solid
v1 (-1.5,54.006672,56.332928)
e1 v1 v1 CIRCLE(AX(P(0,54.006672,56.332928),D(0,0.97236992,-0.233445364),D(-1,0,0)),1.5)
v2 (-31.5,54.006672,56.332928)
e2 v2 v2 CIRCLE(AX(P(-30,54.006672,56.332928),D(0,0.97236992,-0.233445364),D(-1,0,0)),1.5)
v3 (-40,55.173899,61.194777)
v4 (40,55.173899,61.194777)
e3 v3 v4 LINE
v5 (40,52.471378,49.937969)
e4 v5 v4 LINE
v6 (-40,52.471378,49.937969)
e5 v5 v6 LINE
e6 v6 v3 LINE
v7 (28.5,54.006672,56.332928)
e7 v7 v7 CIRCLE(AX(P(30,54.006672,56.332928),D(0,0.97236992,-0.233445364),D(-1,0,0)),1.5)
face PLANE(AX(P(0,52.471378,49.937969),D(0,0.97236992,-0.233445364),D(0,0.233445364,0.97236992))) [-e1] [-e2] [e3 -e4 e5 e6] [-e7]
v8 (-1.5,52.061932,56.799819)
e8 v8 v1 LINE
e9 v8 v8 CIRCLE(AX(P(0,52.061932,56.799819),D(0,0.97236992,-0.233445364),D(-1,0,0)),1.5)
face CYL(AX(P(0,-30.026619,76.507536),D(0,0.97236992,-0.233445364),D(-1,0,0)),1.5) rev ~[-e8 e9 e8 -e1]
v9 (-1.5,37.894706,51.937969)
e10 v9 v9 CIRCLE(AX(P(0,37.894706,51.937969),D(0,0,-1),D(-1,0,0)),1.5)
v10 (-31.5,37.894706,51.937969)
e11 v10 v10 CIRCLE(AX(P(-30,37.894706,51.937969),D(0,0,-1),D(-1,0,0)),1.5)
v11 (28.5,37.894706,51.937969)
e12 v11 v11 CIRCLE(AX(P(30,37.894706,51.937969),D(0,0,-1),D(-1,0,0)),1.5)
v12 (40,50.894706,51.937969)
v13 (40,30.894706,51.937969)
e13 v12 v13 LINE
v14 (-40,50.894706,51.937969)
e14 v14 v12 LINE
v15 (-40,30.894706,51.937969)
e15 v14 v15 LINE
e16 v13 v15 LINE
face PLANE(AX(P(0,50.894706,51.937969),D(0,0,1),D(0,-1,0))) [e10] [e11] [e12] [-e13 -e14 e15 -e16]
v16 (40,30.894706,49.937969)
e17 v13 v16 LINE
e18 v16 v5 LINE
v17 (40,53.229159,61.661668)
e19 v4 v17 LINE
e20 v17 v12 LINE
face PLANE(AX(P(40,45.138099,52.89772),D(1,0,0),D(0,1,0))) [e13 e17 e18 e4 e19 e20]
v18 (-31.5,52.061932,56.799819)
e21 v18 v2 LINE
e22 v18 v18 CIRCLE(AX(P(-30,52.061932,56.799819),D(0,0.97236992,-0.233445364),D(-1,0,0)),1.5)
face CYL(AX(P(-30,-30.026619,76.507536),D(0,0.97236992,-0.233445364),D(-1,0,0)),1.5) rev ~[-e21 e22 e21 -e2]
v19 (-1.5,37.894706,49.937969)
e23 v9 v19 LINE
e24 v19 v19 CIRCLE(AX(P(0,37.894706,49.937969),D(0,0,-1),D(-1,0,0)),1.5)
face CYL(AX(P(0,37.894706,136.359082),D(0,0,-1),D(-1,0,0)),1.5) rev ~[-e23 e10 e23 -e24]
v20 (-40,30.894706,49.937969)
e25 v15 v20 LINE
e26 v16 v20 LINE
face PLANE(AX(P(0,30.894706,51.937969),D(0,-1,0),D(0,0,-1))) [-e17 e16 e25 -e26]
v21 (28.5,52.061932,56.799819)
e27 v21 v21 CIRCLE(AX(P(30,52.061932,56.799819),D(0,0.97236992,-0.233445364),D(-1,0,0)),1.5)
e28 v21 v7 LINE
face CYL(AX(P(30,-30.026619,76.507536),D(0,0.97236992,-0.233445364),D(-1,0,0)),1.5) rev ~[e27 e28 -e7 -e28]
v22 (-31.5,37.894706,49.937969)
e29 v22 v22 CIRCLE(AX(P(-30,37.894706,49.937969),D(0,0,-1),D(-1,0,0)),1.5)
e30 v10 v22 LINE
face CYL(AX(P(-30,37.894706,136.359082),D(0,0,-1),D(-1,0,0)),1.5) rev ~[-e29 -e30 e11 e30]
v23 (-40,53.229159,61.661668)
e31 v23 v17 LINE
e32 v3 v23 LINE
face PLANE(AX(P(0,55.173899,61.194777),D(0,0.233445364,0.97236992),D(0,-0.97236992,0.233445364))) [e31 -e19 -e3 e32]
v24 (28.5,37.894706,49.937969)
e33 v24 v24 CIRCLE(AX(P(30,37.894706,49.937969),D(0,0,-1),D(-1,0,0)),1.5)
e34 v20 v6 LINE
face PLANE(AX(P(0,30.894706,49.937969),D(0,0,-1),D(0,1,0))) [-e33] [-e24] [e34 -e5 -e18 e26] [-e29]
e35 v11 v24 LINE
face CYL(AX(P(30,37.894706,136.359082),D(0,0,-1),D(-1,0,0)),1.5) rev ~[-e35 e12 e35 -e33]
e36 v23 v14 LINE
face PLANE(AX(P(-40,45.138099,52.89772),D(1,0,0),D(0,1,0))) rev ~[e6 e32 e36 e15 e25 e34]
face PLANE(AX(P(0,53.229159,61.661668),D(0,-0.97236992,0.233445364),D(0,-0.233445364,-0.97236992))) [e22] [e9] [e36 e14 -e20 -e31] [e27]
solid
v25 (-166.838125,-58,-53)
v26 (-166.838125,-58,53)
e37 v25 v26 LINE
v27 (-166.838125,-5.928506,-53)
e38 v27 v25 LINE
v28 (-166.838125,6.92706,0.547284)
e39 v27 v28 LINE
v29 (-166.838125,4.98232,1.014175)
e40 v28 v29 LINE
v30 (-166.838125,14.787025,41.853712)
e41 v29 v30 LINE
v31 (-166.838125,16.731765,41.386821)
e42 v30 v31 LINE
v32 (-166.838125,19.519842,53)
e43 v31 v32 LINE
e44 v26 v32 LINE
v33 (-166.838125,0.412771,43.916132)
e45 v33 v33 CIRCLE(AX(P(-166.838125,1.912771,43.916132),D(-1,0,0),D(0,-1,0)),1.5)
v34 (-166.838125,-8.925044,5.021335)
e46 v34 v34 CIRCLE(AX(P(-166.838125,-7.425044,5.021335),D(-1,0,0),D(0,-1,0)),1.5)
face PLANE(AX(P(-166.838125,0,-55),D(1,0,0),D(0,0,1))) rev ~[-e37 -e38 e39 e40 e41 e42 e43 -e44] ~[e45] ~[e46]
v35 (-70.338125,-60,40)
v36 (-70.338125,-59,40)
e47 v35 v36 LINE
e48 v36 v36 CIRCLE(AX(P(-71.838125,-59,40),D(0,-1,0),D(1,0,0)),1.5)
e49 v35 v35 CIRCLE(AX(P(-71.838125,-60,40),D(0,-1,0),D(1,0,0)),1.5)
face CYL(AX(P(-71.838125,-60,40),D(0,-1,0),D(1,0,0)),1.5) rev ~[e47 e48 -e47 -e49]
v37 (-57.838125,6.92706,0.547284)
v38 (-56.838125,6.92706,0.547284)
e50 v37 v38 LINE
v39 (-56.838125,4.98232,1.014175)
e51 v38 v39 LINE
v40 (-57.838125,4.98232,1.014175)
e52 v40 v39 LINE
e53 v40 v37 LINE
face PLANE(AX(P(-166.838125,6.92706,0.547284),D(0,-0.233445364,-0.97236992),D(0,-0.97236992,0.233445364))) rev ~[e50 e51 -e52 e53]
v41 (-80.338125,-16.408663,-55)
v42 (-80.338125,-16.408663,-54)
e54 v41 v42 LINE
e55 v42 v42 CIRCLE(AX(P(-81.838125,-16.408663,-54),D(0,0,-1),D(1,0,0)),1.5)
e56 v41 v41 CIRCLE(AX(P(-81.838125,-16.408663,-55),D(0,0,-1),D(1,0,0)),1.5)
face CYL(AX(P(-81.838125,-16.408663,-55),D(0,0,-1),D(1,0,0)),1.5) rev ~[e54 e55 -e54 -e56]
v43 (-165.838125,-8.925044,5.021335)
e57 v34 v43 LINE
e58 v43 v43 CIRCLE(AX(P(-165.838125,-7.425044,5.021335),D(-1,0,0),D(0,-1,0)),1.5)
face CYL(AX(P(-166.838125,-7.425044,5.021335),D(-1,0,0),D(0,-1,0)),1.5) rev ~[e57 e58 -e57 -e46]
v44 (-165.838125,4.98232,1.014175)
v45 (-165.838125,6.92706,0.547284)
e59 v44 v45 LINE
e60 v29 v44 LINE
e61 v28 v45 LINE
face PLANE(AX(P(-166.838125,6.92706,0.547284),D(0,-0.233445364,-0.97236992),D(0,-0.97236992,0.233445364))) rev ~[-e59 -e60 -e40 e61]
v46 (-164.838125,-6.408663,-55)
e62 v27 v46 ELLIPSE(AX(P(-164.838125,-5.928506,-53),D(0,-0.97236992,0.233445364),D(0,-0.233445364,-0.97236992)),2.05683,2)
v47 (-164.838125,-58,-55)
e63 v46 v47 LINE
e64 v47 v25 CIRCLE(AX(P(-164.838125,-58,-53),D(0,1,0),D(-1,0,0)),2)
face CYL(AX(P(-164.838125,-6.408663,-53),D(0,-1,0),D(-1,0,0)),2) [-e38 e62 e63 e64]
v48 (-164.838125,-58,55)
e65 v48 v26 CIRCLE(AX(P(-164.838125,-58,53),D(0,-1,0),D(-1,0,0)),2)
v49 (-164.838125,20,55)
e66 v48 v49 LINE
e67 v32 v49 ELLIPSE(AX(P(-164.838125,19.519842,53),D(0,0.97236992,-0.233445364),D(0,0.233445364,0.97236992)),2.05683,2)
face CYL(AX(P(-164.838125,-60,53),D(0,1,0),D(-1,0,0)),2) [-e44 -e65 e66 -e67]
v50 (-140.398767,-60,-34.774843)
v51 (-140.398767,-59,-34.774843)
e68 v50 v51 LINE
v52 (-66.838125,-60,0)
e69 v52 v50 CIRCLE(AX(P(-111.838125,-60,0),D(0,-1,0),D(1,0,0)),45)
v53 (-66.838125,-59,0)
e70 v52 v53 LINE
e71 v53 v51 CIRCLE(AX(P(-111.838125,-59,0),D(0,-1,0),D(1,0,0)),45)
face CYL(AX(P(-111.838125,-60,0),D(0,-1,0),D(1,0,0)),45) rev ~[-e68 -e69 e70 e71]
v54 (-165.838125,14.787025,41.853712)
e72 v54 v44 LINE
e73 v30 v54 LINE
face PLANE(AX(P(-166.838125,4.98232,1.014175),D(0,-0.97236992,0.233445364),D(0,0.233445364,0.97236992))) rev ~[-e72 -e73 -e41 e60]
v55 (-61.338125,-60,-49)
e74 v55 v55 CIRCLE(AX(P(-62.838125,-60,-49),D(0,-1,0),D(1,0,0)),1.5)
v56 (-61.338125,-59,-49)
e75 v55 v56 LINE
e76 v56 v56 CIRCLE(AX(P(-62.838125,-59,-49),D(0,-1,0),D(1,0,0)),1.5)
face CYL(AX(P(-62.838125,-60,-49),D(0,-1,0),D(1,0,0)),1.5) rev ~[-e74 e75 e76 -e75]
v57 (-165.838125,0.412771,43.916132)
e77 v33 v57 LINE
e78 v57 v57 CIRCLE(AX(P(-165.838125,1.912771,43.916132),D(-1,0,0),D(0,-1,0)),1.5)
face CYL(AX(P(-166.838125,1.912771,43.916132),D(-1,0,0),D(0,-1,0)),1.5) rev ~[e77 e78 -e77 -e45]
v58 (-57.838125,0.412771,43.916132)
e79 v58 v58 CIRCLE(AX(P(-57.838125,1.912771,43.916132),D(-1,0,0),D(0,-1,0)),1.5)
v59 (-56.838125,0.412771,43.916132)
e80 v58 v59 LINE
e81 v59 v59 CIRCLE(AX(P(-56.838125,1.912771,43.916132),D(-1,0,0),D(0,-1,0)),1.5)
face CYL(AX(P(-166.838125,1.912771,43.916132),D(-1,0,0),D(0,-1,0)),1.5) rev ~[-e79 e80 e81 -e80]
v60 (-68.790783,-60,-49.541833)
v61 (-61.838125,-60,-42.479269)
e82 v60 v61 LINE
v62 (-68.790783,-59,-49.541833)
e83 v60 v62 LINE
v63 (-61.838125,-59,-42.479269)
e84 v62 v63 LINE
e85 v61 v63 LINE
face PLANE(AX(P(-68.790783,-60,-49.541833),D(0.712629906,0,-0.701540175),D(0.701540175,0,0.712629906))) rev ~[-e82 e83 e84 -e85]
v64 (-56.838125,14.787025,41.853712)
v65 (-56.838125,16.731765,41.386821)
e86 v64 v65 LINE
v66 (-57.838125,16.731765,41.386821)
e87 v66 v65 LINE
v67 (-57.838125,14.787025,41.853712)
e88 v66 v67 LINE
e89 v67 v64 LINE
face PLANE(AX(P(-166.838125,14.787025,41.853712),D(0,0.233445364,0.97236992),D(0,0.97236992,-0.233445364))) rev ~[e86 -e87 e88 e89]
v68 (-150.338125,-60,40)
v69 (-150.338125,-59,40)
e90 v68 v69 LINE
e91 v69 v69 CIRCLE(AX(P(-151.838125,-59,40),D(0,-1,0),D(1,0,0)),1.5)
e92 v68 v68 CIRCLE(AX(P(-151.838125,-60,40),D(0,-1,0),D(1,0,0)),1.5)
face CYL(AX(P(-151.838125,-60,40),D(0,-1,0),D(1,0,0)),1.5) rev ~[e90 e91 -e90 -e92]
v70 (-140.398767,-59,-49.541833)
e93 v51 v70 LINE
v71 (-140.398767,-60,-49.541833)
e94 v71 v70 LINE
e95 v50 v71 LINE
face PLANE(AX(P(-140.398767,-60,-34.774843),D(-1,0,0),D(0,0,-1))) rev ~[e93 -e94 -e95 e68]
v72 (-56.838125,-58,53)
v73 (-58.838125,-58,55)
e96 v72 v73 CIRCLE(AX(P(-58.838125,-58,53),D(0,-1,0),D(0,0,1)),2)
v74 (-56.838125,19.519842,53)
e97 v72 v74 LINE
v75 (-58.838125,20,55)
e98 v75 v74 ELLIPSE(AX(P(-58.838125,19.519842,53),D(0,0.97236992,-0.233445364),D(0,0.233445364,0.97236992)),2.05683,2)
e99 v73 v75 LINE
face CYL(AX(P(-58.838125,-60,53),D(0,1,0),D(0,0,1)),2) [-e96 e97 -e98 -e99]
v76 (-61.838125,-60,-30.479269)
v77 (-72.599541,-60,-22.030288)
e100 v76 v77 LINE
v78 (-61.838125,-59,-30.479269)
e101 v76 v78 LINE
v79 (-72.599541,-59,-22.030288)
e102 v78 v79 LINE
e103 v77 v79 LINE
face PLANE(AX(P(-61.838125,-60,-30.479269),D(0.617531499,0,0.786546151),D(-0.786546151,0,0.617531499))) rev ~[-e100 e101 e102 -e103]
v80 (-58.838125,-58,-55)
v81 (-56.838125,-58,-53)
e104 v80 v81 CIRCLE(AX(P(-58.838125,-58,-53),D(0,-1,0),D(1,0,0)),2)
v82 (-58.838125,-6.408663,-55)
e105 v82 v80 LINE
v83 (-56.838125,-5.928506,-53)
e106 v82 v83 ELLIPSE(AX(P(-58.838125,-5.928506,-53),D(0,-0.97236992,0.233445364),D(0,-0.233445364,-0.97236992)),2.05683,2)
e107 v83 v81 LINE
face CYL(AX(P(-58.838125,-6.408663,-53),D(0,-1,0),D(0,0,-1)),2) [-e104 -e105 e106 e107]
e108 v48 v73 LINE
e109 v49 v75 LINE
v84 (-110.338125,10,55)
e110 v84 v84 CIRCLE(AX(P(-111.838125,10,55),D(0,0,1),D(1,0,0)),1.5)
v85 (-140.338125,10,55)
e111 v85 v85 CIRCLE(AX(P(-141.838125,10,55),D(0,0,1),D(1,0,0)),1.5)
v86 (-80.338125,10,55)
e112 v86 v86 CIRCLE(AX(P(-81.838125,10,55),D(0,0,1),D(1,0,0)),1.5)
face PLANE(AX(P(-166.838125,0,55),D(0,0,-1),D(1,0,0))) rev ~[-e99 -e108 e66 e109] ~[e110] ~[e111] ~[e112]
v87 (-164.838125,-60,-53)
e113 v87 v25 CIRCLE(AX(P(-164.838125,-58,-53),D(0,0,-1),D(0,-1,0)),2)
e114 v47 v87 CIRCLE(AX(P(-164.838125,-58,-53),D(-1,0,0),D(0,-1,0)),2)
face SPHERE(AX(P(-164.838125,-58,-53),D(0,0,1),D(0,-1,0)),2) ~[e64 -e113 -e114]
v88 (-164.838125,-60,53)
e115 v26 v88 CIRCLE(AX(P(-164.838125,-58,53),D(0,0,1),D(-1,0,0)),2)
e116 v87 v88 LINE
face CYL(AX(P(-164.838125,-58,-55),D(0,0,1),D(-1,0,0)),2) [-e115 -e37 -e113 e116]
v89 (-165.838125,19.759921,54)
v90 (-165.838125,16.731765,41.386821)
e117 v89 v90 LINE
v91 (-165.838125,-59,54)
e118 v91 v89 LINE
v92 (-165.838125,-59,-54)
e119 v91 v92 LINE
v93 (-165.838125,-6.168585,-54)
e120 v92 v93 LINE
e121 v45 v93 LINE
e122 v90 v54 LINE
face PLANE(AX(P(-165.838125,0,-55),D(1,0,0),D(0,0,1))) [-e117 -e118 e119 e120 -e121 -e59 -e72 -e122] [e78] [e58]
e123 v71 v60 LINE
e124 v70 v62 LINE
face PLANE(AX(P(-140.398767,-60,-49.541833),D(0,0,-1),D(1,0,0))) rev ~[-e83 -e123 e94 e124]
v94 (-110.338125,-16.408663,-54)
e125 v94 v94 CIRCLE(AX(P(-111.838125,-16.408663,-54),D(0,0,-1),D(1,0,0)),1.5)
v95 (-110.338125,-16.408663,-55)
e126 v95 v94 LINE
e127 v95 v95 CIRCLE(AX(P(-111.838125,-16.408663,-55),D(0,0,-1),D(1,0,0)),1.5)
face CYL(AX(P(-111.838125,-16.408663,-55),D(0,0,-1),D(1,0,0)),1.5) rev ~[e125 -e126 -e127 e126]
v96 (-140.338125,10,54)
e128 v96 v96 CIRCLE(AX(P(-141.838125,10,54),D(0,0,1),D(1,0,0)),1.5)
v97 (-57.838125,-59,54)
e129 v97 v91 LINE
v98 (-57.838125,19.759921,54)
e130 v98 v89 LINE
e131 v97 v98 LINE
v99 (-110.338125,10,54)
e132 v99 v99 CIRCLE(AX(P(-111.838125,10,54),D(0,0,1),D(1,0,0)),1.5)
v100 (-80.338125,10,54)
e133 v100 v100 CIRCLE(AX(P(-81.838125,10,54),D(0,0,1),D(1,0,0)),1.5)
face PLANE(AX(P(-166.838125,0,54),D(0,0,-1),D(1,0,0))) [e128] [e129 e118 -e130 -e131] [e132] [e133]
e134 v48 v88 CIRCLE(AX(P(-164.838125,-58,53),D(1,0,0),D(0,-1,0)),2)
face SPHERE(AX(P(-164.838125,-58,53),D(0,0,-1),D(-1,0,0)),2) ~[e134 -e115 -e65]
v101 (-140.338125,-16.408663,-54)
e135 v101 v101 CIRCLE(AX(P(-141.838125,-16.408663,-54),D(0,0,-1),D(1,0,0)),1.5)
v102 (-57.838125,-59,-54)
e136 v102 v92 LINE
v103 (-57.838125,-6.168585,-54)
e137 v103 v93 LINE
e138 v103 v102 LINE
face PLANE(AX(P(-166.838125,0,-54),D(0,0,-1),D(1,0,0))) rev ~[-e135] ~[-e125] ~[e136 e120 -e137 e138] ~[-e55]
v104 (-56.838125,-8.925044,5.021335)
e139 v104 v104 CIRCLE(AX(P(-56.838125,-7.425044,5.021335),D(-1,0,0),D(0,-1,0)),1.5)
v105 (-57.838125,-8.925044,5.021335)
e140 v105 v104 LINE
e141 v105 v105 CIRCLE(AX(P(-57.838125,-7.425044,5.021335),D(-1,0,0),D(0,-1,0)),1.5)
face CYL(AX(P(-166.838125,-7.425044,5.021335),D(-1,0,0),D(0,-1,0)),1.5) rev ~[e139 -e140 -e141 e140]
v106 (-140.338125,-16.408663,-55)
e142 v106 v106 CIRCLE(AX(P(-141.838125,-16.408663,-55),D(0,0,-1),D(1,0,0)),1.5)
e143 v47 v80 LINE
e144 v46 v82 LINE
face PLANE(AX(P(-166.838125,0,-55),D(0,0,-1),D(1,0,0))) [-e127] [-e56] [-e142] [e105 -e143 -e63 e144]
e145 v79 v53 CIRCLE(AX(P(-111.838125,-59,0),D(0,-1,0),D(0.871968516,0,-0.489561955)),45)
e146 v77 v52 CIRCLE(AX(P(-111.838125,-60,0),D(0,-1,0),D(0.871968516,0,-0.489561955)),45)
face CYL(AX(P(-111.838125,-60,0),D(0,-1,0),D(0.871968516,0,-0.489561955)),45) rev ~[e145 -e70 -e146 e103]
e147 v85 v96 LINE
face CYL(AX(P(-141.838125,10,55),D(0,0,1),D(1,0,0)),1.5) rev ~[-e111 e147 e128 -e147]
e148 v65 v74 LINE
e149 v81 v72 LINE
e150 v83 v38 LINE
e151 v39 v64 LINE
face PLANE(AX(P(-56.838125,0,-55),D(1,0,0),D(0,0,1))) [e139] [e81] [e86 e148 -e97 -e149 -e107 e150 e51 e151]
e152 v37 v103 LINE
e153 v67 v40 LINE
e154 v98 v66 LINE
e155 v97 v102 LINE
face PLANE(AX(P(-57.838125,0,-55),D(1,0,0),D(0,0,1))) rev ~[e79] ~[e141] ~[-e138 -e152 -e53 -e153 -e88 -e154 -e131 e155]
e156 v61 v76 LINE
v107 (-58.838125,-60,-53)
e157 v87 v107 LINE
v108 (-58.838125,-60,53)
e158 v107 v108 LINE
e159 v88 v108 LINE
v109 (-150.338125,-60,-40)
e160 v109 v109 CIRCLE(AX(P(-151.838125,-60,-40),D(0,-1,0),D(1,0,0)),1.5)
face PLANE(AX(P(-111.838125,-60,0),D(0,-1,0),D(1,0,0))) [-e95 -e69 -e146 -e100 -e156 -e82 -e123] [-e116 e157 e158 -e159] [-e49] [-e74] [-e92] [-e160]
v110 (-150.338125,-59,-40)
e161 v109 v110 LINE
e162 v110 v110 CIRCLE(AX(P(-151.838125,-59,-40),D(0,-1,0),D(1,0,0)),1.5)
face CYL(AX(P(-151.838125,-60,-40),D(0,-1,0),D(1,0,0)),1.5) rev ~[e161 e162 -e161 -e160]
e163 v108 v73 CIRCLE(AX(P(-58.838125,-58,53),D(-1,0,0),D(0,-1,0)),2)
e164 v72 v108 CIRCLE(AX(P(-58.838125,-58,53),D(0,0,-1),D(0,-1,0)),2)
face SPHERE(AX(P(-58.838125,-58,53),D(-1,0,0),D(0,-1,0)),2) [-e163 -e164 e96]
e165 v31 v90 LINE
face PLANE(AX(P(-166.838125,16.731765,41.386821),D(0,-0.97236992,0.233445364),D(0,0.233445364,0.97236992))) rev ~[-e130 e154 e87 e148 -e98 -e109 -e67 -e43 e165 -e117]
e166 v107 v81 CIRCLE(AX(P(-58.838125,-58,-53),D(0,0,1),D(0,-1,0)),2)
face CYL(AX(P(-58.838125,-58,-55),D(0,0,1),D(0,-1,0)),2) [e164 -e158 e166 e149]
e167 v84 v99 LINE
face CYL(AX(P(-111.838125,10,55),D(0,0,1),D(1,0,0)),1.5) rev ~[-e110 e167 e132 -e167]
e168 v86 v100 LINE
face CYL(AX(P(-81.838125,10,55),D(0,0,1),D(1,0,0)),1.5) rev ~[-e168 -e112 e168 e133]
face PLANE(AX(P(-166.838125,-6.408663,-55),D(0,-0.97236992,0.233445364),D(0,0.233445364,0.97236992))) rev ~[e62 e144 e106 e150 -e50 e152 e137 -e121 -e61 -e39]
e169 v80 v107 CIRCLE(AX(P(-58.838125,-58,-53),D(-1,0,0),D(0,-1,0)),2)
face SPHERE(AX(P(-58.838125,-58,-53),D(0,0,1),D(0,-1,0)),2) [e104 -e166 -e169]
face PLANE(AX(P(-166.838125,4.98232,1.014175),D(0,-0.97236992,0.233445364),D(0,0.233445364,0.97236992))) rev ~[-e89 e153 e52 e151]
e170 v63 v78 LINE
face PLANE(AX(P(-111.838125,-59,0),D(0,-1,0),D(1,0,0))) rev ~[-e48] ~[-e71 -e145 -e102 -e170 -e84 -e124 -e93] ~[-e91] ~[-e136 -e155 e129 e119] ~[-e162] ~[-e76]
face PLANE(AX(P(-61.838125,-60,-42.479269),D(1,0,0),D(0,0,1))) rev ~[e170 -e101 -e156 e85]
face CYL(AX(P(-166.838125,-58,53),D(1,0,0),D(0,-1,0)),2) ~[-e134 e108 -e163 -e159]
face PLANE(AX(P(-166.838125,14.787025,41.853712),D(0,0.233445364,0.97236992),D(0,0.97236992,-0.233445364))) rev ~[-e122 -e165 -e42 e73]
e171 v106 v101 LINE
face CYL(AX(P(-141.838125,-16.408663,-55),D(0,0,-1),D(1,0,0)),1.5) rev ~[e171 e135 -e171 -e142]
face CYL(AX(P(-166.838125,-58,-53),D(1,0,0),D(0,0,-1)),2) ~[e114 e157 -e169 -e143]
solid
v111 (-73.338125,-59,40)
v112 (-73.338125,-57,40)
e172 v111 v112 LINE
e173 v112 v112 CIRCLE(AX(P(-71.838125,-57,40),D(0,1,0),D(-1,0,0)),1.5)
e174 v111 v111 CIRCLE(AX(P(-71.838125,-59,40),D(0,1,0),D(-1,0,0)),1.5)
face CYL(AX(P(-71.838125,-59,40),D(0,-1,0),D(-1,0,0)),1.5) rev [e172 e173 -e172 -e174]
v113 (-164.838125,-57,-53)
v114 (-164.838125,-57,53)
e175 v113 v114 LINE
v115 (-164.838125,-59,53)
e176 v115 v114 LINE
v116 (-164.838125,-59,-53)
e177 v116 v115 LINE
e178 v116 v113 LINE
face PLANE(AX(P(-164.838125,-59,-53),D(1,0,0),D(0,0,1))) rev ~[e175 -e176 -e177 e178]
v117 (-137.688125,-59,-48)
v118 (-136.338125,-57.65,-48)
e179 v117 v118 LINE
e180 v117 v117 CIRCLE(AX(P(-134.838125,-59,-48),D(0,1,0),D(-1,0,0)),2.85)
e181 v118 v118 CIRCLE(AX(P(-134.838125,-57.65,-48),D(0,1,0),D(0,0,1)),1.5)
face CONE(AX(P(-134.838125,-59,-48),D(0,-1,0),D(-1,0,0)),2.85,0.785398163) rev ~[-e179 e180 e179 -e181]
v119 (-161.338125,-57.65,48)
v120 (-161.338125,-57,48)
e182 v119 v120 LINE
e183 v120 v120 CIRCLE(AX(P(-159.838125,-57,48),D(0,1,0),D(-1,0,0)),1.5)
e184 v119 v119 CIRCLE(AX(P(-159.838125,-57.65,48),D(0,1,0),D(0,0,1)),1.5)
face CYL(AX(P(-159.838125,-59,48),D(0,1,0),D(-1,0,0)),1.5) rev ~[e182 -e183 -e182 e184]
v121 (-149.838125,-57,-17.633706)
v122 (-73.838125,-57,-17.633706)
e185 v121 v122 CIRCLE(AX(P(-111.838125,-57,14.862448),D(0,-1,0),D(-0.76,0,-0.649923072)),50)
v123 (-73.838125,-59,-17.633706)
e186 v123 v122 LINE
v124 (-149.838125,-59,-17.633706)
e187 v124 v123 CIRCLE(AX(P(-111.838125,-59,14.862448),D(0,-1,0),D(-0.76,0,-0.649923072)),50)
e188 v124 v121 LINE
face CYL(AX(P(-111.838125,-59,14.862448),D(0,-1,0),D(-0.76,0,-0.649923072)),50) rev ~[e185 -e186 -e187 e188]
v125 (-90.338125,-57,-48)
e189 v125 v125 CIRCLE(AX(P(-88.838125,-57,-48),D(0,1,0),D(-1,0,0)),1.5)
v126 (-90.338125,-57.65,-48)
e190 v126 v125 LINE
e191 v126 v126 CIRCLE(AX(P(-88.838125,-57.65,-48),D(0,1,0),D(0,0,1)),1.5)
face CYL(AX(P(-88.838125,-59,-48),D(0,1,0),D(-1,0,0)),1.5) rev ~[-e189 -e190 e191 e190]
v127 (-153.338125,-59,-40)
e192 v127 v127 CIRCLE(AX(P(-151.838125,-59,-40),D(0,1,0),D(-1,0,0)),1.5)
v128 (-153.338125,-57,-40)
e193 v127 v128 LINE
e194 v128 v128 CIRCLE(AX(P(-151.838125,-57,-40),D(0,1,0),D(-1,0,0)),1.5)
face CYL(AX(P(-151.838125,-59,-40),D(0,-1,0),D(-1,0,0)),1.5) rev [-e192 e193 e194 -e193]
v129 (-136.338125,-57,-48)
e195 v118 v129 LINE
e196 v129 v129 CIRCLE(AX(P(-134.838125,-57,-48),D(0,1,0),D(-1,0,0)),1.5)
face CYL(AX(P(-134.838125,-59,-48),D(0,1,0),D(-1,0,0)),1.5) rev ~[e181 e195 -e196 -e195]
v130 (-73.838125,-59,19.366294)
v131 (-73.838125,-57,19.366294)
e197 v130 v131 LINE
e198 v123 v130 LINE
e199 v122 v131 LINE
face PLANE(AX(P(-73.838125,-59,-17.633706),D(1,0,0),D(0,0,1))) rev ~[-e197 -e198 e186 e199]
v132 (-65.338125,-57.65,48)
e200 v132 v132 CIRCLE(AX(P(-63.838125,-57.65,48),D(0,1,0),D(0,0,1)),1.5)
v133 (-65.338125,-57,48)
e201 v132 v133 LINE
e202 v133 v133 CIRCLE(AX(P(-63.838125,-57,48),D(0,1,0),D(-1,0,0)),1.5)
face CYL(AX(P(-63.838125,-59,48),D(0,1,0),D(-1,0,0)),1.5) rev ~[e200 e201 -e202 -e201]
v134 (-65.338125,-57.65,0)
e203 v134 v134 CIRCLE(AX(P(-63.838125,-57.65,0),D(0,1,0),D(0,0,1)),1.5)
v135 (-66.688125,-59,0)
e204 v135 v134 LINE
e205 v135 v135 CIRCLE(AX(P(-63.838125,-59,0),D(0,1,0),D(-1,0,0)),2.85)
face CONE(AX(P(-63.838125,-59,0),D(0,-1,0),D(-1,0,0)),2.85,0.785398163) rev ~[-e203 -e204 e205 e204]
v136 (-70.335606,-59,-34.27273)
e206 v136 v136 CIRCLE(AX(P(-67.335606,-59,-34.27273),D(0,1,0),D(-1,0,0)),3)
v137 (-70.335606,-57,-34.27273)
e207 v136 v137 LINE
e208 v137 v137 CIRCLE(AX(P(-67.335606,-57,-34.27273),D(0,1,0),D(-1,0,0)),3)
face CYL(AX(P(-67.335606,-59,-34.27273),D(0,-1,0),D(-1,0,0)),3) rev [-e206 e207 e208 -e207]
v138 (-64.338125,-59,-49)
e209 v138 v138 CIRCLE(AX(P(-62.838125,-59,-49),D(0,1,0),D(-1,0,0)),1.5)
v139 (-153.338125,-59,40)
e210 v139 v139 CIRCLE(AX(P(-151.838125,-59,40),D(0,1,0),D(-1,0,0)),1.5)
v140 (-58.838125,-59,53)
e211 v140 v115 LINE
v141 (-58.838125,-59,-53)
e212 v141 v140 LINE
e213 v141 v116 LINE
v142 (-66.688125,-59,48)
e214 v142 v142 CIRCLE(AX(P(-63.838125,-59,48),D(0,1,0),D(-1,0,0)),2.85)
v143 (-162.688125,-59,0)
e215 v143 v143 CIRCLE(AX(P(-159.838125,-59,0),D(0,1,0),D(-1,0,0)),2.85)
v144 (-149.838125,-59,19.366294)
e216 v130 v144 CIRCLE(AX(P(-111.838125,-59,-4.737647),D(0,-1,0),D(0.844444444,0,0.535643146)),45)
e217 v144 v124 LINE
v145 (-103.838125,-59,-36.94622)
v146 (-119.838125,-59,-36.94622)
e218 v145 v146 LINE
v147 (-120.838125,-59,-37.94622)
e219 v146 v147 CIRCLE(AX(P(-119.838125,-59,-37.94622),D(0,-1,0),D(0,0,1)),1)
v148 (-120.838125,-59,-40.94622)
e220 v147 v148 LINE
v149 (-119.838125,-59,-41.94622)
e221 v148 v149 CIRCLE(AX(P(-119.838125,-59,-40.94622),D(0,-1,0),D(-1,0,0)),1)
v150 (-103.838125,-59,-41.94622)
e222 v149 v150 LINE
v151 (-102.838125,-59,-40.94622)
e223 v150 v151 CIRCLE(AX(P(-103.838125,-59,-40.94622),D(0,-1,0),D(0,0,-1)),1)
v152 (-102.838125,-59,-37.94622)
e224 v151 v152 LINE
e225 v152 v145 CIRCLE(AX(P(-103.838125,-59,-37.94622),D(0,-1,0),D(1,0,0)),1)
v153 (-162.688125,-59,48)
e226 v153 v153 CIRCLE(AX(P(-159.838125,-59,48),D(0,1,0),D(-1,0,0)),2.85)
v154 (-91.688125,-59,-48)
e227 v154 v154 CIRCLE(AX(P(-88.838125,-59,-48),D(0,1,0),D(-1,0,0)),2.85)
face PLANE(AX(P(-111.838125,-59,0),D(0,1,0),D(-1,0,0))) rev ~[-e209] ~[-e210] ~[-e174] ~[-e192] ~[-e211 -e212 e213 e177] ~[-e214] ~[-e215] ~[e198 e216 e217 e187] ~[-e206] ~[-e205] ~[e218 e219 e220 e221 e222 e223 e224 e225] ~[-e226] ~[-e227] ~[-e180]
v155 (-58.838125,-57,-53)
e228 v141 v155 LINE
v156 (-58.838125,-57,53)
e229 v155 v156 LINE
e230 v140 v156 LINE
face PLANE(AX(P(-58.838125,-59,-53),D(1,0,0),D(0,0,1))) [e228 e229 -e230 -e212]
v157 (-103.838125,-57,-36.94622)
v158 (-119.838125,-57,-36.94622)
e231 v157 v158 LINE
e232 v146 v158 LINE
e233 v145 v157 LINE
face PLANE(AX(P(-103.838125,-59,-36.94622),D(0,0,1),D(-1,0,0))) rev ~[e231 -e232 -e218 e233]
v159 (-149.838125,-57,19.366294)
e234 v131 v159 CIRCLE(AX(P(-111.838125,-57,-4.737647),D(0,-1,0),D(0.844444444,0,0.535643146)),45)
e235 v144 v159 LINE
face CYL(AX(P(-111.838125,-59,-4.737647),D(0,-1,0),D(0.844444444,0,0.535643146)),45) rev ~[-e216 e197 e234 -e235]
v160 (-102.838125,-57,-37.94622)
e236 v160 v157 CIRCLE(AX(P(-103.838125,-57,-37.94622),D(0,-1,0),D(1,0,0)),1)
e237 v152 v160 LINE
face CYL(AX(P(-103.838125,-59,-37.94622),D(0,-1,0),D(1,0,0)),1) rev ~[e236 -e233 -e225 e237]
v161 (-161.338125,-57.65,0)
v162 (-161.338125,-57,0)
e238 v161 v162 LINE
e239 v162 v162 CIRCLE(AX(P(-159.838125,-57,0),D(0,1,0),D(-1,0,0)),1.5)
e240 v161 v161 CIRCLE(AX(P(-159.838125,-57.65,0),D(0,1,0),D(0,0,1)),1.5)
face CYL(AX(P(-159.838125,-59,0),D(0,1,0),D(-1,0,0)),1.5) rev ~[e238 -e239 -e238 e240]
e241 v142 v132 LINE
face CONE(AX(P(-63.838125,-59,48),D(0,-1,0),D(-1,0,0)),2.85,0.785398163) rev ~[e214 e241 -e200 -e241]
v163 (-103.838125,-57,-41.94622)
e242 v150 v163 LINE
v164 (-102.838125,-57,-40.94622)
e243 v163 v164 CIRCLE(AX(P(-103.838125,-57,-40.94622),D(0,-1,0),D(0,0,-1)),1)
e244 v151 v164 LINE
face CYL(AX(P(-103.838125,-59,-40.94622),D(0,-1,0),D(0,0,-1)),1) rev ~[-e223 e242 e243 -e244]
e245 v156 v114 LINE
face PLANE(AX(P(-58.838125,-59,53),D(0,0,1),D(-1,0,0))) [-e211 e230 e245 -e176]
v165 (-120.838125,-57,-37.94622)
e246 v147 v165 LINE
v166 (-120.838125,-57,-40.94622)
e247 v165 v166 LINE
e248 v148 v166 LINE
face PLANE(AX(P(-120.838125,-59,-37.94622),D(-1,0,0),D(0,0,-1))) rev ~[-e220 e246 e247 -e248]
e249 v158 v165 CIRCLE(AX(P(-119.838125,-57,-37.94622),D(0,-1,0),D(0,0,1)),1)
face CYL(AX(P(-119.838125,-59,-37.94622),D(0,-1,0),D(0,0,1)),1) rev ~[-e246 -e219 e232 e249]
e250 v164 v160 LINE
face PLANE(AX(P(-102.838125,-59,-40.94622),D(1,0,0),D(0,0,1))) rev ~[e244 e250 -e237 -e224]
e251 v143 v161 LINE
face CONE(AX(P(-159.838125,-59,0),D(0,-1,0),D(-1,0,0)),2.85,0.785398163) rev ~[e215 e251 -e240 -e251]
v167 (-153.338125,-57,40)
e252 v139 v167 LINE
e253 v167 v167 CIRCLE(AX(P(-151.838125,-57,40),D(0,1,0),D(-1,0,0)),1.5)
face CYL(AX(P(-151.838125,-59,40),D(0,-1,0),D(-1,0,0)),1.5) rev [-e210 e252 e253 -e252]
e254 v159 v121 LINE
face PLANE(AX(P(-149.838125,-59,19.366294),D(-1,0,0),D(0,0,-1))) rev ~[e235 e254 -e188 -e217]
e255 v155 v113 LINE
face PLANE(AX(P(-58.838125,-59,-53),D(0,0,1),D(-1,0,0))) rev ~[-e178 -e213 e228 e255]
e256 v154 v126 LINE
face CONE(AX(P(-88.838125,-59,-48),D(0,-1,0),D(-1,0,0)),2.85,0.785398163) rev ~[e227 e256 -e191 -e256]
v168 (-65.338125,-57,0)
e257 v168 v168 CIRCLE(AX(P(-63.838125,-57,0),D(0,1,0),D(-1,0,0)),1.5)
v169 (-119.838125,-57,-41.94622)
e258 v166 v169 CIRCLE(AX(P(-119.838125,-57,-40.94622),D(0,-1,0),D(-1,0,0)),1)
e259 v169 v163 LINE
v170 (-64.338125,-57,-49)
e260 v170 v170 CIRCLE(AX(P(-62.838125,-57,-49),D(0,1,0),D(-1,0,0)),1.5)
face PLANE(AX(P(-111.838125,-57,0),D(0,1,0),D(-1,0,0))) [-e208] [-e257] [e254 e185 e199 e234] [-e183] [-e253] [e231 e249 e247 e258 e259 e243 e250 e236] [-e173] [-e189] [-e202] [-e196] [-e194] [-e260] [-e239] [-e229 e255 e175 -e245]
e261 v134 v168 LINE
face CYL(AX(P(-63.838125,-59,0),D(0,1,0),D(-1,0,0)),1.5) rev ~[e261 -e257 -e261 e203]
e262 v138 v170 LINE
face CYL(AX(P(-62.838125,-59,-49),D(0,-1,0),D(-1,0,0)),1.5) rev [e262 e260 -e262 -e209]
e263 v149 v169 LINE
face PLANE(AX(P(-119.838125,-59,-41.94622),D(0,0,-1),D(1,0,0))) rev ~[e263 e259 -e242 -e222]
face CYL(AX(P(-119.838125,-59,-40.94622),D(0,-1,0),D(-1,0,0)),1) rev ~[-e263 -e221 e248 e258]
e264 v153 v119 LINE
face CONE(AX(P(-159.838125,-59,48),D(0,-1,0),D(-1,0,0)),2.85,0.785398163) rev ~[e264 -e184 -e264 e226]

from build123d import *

# Parameters (mm, degrees)
F0_W            = 110
F0_H            = 110
F1_DEPTH        = 60
F2_T            = -1
F3_R            = 1.5
F4_DEPTH        = 110
F5_R            = 2
F6_R            = 1.5
F7_DEPTH        = 1
F8_W            = 106
F8_H            = 106
F8_R            = 1.5
F8_R_2          = 3
F9_DEPTH        = 2
F12_D           = 3
F12_CSINK_D     = 5.7
F12_CSINK_ANGLE = 90
F13_R           = 1.5
F14_R           = 1.5
F15_DEPTH       = 2
F16_DEPTH       = 2
F18_DEPTH       = 40
F21_D           = 3
F21_ON_F19_D    = 3


with BuildPart() as f1:
    # F0 (on Front) → F1 (new body, symmetric)
    with BuildSketch(Plane.XZ):
        with Locations((-111.8381246924, 0)):
            Rectangle(F0_W, F0_H)
    extrude(amount=F1_DEPTH, both=True)

    # F2
    f2_openings = [f1.faces().sort_by_distance(p)[0] for p in [
        (-111.838125, 60, 0),
    ]]
    offset(amount=F2_T, openings=f2_openings)

    # F3 (on face) → F4 (cut)
    with BuildSketch(Plane(origin=(-166.8381246924, 0, 0), x_dir=(0, -1, 0), z_dir=(-1, 0, 0))):
        Polygon((-16.731764906, 41.3868211144), (-20, 55), (-89.8332582524, 55), (-89.8332582524, -55), (6.4086634988, -55), (-6.9270596241, 0.5472844577), align=None)
        Polygon((-14.7870250652, 41.8537118421), (-16.731764906, 41.3868211144), (-6.9270596241, 0.5472844577), (-4.9823197833, 1.0141751854), align=None)
        with Locations((-1.9127707362, 43.9161316519)):
            Circle(F3_R)
        with Locations((7.425043818, 5.021334836)):
            Circle(F3_R)
    extrude(amount=-F4_DEPTH, mode=Mode.SUBTRACT)

    # F5
    f5_edges = [f1.edges().sort_by_distance(p)[0] for p in [
        (-166.838125, -60, 0),
        (-166.838125, -20, 55),
        (-111.838125, -60, 55),
        (-56.838125, -60, 0),
        (-56.838125, -20, 55),
        (-111.838125, -60, -55),
        (-56.838125, -33.204332, -55),
        (-166.838125, -33.204332, -55),
    ]]
    fillet(f5_edges, radius=F5_R)

    # F6 (on face) → F7 (cut)
    with BuildSketch(Plane.XZ.offset(60)):
        with BuildLine():
            ThreePointArc((-72.5995414842, -22.0302879648), (-68.3022989602, -11.3855995808), (-66.8381246924, 0))
            ThreePointArc((-66.8381246924, 0), (-131.0705335784, 40.6830978226), (-140.3987668455, -34.7748432032))
            ThreePointArc((-140.3987668455, -34.7748432032), (-103.5248504668, -44.2254391911), (-72.5995414842, -22.0302879648))
        make_face()
        with BuildLine():
            ThreePointArc((-72.5995414842, -22.0302879648), (-103.5248504668, -44.2254391911), (-140.3987668455, -34.7748432032))
            Line((-140.3987668455, -34.7748432032), (-140.3987668455, -49.5418331784))
            Line((-140.3987668455, -49.5418331784), (-68.7907829881, -49.5418331784))
            Line((-68.7907829881, -49.5418331784), (-61.8381246924, -42.4792694113))
            Line((-61.8381246924, -42.4792694113), (-61.8381246924, -30.4792694113))
            Line((-61.8381246924, -30.4792694113), (-72.5995414842, -22.0302879648))
        make_face()
        with Locations((-151.8381246924, 40)):
            Circle(F6_R)
        with Locations((-71.8381246924, 40)):
            Circle(F6_R)
        with Locations((-151.8381246924, -40)):
            Circle(F6_R)
        with Locations((-62.8381246924, -49)):
            Circle(F6_R)
    extrude(amount=-F7_DEPTH, mode=Mode.SUBTRACT)

    # F13 (on face) + F14 (on face) → F15 (cut)
    with BuildSketch(Plane.XY.offset(55)):
        with Locations((-141.8381246924, 10)):
            Circle(F13_R)
        with Locations((-81.8381246924, 10)):
            Circle(F13_R)
        with Locations((-111.8381246924, 10)):
            Circle(F13_R)
    with BuildSketch(Plane(origin=(0, 0, -55), x_dir=(1, 0, 0), z_dir=(0, 0, -1))):
        with Locations((-141.8381246924, 16.4086634988)):
            Circle(F14_R)
        with Locations((-81.8381246924, 16.4086634988)):
            Circle(F14_R)
        with Locations((-111.8381246924, 16.4086634988)):
            Circle(F14_R)
    extrude(amount=-F15_DEPTH, dir=(0, 0, 1), mode=Mode.SUBTRACT)

    # F14 (on face) → F16 (cut)
    with BuildSketch(Plane(origin=(0, 0, -55), x_dir=(1, 0, 0), z_dir=(0, 0, -1))):
        with Locations((-141.8381246924, 16.4086634988)):
            Circle(F14_R)
        with Locations((-81.8381246924, 16.4086634988)):
            Circle(F14_R)
        with Locations((-111.8381246924, 16.4086634988)):
            Circle(F14_R)
    extrude(amount=-F16_DEPTH, mode=Mode.SUBTRACT)


with BuildPart() as f9:
    # F8 (on face) → F9 (new body)
    with BuildSketch(Plane(origin=(0, -59, 0), x_dir=(-1, 0, 0), z_dir=(0, 1, 0))):
        with Locations((111.8381246924, 0)):
            Rectangle(F8_W, F8_H)
        with Locations((62.8381246924, -49)):
            Circle(F8_R, mode=Mode.SUBTRACT)
        with Locations((67.3356056213, -34.2727303505)):
            Circle(F8_R_2, mode=Mode.SUBTRACT)
        with BuildLine():
            ThreePointArc((102.8381246924, -37.9462198019), (103.1310179113, -37.2391130207), (103.8381246924, -36.9462198019))
            Line((103.8381246924, -36.9462198019), (119.8381246924, -36.9462198019))
            ThreePointArc((119.8381246924, -36.9462198019), (120.5452314736, -37.2391130207), (120.8381246924, -37.9462198019))
            Line((120.8381246924, -37.9462198019), (120.8381246924, -40.9462198019))
            ThreePointArc((120.8381246924, -40.9462198019), (120.5452314736, -41.6533265831), (119.8381246924, -41.9462198019))
            Line((119.8381246924, -41.9462198019), (103.8381246924, -41.9462198019))
            ThreePointArc((103.8381246924, -41.9462198019), (103.1310179113, -41.6533265831), (102.8381246924, -40.9462198019))
            Line((102.8381246924, -40.9462198019), (102.8381246924, -37.9462198019))
        make_face(mode=Mode.SUBTRACT)
        with Locations((151.8381246924, -40)):
            Circle(F8_R, mode=Mode.SUBTRACT)
        with Locations((71.8381246924, 40)):
            Circle(F8_R, mode=Mode.SUBTRACT)
        with BuildLine():
            Line((73.8381246924, -17.6337056415), (73.8381246924, 19.3662943585))
            ThreePointArc((73.8381246924, 19.3662943585), (111.8381246924, 40.2623527721), (149.8381246924, 19.3662943585))
            Line((149.8381246924, 19.3662943585), (149.8381246924, -17.6337056415))
            ThreePointArc((149.8381246924, -17.6337056415), (111.8381246924, -35.1375520229), (73.8381246924, -17.6337056415))
        make_face(mode=Mode.SUBTRACT)
        with Locations((151.8381246924, 40)):
            Circle(F8_R, mode=Mode.SUBTRACT)
    extrude(amount=F9_DEPTH)

    # F12 (through all)
    with Locations(Plane.XZ.offset(59)):
        with Locations((-134.8381246924, -48), (-88.8381246924, -48), (-159.8381246924, 48), (-63.8381246924, 48), (-159.8381246924, 0), (-63.8381246924, 0)):
            CounterSinkHole(F12_D / 2, F12_CSINK_D / 2, counter_sink_angle=F12_CSINK_ANGLE)


with BuildPart() as f18:
    # F17 (on Right) → F18 (new body, symmetric)
    with BuildSketch(Plane.YZ):
        Polygon((52.4713784819, 49.9379689601), (55.1738990921, 61.1947774364), (53.2291592513, 61.6616681641), (50.8947056127, 51.9379689601), (30.8947056127, 51.9379689601), (30.8947056127, 49.9379689601), align=None)
    extrude(amount=F18_DEPTH, both=True)

    # F21 (through all)
    with Locations(Plane(origin=(0, 36.3314379383, -8.7224065358), x_dir=(1, 0, 0), z_dir=(0, -0.9723699204, 0.2334453639))):
        with Locations((-30, 67.3840518135), (0, 67.3840518135), (30, 67.3840518135)):
            Hole(F21_D / 2)

    # F21 on F19 (through all)
    with Locations(Plane.XY.offset(51.9379689601)):
        with Locations((-30, 37.8947056127), (0, 37.8947056127), (30, 37.8947056127)):
            Hole(F21_ON_F19_D / 2)


solid = Compound([f1.part, f9.part, f18.part])
